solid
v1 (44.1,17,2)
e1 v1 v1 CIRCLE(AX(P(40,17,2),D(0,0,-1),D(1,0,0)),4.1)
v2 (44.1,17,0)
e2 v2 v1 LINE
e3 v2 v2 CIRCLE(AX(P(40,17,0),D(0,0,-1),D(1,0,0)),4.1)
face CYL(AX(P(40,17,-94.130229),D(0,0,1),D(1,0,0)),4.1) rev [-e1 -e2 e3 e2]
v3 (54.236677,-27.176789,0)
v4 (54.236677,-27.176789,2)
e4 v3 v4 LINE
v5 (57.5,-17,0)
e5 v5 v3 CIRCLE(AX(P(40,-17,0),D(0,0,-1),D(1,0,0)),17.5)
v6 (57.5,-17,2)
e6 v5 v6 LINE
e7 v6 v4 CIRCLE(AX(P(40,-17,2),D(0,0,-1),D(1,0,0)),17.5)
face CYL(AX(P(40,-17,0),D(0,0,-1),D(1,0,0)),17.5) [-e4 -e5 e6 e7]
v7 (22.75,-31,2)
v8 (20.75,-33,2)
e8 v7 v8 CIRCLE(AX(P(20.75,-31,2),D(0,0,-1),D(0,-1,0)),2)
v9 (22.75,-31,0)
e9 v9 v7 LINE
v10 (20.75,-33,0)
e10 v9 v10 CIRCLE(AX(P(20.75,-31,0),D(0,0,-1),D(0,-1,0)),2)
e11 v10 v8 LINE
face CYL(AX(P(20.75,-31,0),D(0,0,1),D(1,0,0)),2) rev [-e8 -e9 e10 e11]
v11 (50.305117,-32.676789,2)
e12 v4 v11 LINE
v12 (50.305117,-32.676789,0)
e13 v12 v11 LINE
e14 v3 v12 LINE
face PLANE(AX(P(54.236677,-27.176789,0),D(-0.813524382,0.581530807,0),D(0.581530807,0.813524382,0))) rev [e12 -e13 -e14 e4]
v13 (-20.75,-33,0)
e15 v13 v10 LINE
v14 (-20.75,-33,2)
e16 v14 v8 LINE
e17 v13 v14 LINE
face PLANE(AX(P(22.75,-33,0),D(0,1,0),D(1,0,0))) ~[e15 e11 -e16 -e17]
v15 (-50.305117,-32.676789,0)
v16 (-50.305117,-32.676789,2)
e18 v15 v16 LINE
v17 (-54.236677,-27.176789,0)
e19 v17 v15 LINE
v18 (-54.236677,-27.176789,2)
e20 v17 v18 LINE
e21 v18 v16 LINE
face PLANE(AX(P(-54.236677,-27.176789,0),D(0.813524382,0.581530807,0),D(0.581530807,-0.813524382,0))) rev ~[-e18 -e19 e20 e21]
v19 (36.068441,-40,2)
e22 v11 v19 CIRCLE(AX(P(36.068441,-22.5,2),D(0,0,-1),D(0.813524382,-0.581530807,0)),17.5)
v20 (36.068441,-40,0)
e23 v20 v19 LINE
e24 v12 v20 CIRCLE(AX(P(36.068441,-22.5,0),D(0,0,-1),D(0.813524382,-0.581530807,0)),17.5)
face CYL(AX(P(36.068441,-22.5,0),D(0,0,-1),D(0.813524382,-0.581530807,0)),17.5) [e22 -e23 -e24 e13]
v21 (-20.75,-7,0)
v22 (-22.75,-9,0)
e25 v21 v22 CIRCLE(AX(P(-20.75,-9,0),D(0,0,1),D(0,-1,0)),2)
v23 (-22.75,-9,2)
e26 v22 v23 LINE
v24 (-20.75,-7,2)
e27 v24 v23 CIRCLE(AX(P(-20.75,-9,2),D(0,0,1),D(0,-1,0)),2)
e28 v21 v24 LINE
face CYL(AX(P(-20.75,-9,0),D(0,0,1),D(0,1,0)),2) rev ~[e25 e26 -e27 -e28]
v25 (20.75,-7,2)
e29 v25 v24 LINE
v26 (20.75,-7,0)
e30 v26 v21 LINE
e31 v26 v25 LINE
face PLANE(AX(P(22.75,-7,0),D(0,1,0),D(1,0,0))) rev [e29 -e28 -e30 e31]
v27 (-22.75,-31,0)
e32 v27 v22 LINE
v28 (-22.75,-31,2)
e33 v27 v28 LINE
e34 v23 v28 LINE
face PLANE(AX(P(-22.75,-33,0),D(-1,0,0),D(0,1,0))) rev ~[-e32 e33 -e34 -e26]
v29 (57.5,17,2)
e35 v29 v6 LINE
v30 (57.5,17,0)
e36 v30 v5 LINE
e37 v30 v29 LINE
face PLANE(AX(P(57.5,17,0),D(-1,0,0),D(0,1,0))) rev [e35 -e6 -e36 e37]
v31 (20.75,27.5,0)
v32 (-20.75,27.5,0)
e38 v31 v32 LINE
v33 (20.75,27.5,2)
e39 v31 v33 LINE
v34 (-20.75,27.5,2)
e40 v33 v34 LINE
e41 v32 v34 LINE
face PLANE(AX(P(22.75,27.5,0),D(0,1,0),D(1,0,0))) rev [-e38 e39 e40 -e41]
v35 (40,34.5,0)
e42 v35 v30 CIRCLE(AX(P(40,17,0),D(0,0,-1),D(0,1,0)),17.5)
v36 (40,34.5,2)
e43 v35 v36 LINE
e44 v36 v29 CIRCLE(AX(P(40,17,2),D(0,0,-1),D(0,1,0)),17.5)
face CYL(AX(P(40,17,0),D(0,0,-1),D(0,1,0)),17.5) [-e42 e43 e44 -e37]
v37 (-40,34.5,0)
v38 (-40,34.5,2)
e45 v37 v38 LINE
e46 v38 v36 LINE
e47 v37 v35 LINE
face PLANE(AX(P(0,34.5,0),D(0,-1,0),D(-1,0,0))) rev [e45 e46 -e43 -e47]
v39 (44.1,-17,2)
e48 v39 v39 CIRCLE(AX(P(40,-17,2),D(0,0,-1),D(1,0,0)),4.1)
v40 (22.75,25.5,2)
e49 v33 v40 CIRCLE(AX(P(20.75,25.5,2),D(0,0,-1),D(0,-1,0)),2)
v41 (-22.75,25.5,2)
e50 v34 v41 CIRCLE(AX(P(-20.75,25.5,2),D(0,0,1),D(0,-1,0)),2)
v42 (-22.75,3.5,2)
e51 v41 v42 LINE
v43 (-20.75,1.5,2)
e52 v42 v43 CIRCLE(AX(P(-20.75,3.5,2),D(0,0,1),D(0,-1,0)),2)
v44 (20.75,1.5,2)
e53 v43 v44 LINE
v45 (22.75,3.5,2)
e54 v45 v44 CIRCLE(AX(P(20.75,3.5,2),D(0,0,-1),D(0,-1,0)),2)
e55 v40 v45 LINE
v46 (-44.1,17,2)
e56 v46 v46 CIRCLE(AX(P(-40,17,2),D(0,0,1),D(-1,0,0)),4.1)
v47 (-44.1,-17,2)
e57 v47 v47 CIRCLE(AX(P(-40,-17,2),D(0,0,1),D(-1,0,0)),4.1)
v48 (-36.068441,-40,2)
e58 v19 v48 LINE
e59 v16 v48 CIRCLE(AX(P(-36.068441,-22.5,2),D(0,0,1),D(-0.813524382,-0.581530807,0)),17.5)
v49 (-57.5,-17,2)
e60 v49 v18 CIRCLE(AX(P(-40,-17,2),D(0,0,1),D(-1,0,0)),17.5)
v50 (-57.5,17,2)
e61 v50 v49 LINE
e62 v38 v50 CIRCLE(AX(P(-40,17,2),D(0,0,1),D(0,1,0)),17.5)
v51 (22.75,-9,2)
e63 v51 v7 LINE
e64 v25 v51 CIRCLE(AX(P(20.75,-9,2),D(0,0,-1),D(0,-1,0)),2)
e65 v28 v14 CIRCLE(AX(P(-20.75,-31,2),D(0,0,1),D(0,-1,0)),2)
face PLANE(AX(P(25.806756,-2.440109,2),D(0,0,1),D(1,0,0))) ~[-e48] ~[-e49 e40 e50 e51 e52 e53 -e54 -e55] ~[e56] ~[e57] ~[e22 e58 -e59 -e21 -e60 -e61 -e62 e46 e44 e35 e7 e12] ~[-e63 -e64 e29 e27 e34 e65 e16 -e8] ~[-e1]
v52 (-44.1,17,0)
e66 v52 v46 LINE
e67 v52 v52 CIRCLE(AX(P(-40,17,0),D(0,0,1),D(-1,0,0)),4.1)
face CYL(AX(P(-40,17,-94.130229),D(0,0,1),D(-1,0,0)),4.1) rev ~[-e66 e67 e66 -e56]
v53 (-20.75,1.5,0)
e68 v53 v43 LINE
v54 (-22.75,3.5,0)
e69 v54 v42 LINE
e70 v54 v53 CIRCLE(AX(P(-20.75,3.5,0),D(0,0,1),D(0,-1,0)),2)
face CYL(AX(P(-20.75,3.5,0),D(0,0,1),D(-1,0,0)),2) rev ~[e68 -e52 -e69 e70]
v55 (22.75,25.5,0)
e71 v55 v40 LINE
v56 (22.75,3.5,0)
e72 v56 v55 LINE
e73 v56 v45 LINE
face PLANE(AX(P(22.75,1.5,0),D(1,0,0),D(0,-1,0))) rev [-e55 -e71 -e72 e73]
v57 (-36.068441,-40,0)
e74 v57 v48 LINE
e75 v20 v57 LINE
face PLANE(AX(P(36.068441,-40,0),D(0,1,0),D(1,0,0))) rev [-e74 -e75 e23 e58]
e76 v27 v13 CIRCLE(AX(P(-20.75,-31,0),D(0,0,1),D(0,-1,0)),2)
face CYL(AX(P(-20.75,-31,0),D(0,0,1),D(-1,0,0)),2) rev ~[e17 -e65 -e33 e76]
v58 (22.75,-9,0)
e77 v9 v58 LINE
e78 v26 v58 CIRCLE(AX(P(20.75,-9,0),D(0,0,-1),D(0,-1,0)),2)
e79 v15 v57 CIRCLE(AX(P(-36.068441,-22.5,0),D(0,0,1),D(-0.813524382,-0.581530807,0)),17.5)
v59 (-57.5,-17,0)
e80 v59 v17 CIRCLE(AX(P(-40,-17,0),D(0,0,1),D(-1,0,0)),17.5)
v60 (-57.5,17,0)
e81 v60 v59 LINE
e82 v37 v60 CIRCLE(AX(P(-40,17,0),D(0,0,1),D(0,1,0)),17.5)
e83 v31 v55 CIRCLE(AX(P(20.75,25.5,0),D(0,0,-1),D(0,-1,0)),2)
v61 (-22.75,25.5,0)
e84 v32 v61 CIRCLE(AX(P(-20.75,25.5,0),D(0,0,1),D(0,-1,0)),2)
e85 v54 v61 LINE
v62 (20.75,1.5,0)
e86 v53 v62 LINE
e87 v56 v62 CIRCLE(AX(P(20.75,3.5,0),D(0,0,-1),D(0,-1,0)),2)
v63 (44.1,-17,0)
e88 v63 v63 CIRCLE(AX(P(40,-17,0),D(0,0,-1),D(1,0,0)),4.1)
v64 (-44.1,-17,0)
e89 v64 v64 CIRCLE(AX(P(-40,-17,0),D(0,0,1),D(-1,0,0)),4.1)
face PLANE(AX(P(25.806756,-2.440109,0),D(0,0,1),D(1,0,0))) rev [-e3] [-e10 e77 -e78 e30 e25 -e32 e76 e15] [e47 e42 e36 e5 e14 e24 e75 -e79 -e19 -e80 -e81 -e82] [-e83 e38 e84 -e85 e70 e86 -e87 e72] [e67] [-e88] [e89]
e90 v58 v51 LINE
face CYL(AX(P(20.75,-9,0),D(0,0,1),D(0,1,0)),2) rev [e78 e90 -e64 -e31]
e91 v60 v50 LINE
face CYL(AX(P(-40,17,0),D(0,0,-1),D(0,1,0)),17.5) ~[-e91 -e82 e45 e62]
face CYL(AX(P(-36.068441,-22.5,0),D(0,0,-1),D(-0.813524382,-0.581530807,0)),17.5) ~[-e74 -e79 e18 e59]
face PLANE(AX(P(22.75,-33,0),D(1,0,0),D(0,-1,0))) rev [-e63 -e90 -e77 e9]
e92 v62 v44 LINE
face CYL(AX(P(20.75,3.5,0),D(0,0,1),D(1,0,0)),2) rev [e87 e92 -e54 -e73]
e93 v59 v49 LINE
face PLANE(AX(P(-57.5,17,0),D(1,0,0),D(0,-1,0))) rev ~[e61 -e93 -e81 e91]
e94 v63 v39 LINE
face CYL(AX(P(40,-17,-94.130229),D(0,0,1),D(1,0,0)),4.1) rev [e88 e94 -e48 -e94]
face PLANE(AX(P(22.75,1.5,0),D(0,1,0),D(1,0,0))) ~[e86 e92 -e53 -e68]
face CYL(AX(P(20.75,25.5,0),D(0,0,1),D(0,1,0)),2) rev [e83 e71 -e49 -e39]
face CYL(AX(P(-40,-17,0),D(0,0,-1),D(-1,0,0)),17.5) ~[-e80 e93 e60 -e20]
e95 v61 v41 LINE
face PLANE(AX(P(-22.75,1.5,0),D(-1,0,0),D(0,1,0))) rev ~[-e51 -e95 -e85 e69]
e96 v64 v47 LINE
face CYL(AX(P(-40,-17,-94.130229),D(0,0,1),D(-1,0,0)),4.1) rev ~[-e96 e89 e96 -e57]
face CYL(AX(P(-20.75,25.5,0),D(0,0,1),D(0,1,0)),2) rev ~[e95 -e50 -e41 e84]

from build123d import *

# Parameters (mm, degrees)
F0_R     = 12.5
F0_W     = 22.75
F0_H     = 26
F1_DEPTH = 2
F2_DEPTH = 25
F3_R     = 2
F4_D     = 8.2


# Not quite as in the source:
# - a feature names something its author has since deleted; it is built from what else it names


with BuildPart() as f1:
    # F0 (on Top) → F1 (new body)
    with BuildSketch(Plane.XY):
        with BuildLine():
            Line((-22.75, 1.5), (-22.75, 27.5))
            Line((-22.75, 27.5), (0, 27.5))
            Line((0, 27.5), (0, 34.5))
            Line((0, 34.5), (-40, 34.5))
            ThreePointArc((-40, 34.5), (-52.3743686708, 29.3743686708), (-57.5, 17))
            Line((-57.5, 17), (-57.5, -17))
            ThreePointArc((-57.5, -17), (-56.6642107828, -22.3436016868), (-54.2366766871, -27.1767891256))
            Line((-54.2366766871, -27.1767891256), (-50.3051172775, -32.6767891256))
            ThreePointArc((-50.3051172775, -32.6767891256), (-44.0733200493, -38.0618734363), (-36.0684405904, -40))
            Line((-36.0684405904, -40), (0, -40))
            Line((0, -40), (0, -33))
            Line((0, -33), (-22.75, -33))
            Line((-22.75, -33), (-22.75, -7))
            Line((-22.75, -7), (0, -7))
            Line((0, -7), (0, 1.5))
            Line((0, 1.5), (-22.75, 1.5))
        make_face()
        with Locations((-40, -17)):
            Circle(F0_R, mode=Mode.SUBTRACT)
        with Locations((-40, 17)):
            Circle(F0_R, mode=Mode.SUBTRACT)
        with Locations((-11.375, 14.5)):
            Rectangle(F0_W, F0_H)
        with Locations((-11.375, -20)):
            Rectangle(F0_W, F0_H)
        with Locations((-40, 17)):
            Circle(F0_R)
        with Locations((-40, -17)):
            Circle(F0_R)
    extrude(amount=F1_DEPTH)

    # F0 (on Top) → F2 (cut)
    with BuildSketch(Plane.XY):
        with Locations((-11.375, 14.5)):
            Rectangle(F0_W, F0_H)
        with Locations((-11.375, -20)):
            Rectangle(F0_W, F0_H)
    extrude(amount=F2_DEPTH, mode=Mode.SUBTRACT)

    # F3
    f3_edges = [f1.edges().sort_by_distance(p)[0] for p in [
        (-22.75, 1.5, 1),
        (-22.75, 27.5, 1),
        (-22.75, -7, 1),
        (-22.75, -33, 1),
    ]]
    fillet(f3_edges, radius=F3_R)

    # F4 (through all)
    with Locations(Plane(origin=(0, 0, 0), x_dir=(1, 0, 0), z_dir=(0, 0, -1))):
        with Locations((-40, -17), (-40, 17)):
            Hole(F4_D / 2)

    # F5: F1 across plane


with BuildPart() as f1_1:
    add(f1.part)
    add(f1.part.mirror(Plane.YZ))


solid = f1_1.part
